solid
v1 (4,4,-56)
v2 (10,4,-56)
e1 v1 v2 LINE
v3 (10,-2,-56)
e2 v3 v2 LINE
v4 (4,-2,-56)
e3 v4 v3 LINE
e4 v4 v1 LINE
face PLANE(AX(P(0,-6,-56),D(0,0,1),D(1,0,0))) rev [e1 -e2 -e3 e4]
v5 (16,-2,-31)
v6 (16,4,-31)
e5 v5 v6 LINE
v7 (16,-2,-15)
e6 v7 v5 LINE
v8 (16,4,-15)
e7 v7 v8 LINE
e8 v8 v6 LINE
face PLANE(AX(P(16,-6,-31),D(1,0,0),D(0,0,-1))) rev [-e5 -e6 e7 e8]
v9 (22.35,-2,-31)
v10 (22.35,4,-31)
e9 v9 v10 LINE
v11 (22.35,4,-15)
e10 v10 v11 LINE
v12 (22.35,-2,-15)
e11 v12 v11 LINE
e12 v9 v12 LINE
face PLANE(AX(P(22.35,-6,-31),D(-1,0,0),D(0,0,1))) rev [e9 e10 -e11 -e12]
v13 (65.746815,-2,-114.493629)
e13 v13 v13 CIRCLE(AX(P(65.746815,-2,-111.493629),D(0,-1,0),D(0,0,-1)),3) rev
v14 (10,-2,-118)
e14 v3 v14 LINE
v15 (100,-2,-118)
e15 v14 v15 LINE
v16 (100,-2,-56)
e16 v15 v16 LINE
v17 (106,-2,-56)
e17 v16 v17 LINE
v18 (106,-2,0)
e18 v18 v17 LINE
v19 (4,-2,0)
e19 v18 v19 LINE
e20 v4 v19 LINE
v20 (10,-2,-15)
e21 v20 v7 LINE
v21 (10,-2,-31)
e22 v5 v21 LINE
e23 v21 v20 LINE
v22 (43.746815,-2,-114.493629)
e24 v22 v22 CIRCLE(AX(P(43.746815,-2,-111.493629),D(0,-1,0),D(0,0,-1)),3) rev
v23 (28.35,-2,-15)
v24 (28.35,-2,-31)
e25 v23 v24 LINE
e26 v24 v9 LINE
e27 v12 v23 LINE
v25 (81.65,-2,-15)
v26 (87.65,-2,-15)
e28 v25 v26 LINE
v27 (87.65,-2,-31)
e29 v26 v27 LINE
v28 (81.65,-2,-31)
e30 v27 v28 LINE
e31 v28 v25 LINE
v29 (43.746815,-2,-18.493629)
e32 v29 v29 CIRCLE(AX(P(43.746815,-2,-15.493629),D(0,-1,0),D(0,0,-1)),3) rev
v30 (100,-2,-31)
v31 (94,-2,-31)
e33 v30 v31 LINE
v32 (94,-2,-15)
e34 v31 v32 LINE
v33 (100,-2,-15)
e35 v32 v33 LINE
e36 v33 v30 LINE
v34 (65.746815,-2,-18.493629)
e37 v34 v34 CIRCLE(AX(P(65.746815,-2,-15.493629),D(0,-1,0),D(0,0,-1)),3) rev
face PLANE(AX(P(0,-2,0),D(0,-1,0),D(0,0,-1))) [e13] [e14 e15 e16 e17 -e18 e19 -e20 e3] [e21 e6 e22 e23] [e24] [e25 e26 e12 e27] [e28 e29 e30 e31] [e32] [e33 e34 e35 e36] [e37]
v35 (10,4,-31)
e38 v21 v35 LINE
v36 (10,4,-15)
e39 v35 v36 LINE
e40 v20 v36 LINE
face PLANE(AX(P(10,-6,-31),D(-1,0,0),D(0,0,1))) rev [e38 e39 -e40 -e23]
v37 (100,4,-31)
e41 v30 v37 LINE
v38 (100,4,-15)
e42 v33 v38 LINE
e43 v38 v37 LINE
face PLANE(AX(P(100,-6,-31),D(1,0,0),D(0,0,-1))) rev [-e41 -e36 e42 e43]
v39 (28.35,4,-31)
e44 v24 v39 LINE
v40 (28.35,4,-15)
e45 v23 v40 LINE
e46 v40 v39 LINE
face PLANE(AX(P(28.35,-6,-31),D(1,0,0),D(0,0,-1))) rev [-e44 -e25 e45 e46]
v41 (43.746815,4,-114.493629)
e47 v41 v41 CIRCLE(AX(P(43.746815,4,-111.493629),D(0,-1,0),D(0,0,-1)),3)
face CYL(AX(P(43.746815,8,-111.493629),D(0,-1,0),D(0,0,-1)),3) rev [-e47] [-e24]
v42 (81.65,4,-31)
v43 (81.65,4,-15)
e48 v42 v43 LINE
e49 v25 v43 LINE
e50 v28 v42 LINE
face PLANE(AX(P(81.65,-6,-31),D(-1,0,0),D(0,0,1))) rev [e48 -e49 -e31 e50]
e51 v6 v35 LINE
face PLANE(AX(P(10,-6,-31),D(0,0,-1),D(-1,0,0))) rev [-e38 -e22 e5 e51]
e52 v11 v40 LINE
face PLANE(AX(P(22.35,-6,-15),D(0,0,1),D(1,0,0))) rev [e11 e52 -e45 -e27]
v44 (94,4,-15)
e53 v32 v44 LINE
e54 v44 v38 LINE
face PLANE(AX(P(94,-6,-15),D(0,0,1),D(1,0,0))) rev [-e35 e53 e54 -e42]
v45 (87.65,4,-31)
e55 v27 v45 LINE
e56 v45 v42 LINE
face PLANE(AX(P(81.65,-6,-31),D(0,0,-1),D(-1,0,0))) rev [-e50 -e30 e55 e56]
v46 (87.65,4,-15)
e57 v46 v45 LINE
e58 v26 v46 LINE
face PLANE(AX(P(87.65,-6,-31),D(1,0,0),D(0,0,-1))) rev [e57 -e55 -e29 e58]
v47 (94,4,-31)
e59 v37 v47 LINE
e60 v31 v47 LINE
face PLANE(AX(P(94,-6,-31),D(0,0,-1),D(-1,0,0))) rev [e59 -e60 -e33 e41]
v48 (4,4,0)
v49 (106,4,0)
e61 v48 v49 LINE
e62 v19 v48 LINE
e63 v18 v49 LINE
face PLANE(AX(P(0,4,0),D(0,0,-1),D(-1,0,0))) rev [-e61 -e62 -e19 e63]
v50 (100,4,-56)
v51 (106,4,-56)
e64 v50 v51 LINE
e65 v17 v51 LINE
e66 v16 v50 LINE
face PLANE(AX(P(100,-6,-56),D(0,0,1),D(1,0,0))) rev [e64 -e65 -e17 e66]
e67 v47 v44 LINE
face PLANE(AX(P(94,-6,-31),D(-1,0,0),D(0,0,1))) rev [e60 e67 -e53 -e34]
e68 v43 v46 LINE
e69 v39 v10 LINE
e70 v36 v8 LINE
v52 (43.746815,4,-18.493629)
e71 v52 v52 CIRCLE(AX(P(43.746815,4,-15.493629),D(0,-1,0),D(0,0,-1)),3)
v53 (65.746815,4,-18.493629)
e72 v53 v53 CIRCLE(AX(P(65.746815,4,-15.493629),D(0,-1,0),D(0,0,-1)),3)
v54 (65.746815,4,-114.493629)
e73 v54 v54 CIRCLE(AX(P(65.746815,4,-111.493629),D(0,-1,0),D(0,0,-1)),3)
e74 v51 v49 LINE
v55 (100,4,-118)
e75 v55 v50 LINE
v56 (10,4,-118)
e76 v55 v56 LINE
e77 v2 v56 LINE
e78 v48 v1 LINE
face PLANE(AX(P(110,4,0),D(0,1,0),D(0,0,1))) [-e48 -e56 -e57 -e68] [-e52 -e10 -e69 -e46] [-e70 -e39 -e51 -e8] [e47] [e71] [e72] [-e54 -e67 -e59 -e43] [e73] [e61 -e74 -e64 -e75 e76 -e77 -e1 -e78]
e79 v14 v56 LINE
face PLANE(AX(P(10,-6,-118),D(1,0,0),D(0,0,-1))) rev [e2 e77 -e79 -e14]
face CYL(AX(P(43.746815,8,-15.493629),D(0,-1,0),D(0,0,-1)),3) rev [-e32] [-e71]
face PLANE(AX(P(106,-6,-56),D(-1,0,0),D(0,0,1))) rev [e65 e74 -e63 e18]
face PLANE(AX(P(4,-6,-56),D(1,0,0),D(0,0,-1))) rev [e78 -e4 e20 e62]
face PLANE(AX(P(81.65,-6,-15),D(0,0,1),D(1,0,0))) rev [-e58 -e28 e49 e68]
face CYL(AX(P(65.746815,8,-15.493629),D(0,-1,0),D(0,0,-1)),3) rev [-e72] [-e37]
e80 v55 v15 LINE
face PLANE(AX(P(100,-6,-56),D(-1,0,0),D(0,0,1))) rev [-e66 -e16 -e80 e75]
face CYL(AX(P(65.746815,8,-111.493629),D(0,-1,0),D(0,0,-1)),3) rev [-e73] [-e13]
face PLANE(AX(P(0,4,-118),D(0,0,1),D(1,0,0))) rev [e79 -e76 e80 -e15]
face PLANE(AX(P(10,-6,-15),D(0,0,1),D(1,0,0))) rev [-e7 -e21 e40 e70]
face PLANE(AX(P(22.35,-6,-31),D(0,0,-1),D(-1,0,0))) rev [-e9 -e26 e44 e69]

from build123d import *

# Parameters (mm, degrees)
SKETCH2_W           = 110
SKETCH2_H           = 118
BOSS_EXTRUDE1_DEPTH = 4
SKETCH3_W           = 10
SKETCH3_H           = 62
BOSS_EXTRUDE2_DEPTH = 16
CUT_EXTRUDE8_DEPTH  = 163.55460621
SKETCH12_W          = 6
SKETCH12_H          = 16
BOSS_EXTRUDE3_DEPTH = 16
SKETCH14_R          = 4
CUT_EXTRUDE9_DEPTH  = 156.961533719
CUT_EXTRUDE10_DEPTH = 3.5
SKETCH24_R          = 3
CUT_EXTRUDE15_DEPTH = 8
SPLIT2_OUTLINE_W    = 16
SPLIT2_OUTLINE_H    = 62
SPLIT2_DEPTH        = 110
SPLIT3_START        = 10
SPLIT3_OUTLINE_W    = 16
SPLIT3_OUTLINE_H    = 16
SPLIT3_OUTLINE_R    = 4
SPLIT3_DEPTH        = 90
SKETCH25_W          = 10
SKETCH25_H          = 62
SKETCH25_W_2        = 6
SKETCH25_H_2        = 16
CUT_EXTRUDE16_DEPTH = 10
SKETCH27_R          = 3.395097118
SKETCH27_R_2        = 3.39905673
BOSS_EXTRUDE4_DEPTH = 4
BOSS_EXTRUDE5_DEPTH = 2
CUT_EXTRUDE18_START = -6
SKETCH29_R          = 3
SKETCH29_W          = 6
SKETCH29_H          = 16
CUT_EXTRUDE18_DEPTH = 6
SKETCH30_W          = 4
SKETCH30_H          = 56
CUT_EXTRUDE19_DEPTH = 10


# Read off the part's stored shape, not the designer's step: Split2, Split3
with BuildPart() as part:
    # Sketch2 → Boss-Extrude1 (new body)
    with BuildSketch(Plane(origin=(0, 0, 0), x_dir=(1, 0, 0), z_dir=(0, 1, 0))):
        with Locations((55, 59)):
            Rectangle(SKETCH2_W, SKETCH2_H)
    extrude(amount=BOSS_EXTRUDE1_DEPTH)

    # Sketch3 → Boss-Extrude2 (add)
    with BuildSketch(Plane(origin=(0, 4, 0), x_dir=(1, 0, 0), z_dir=(0, 1, 0))):
        with Locations((5, 87)):
            Rectangle(SKETCH3_W, SKETCH3_H)
        with Locations((105, 87)):
            Rectangle(SKETCH3_W, SKETCH3_H)
    extrude(amount=BOSS_EXTRUDE2_DEPTH)

    # Sketch11 → Cut-Extrude8 (cut, through all)
    with BuildSketch(Plane.ZY):
        with BuildLine():
            Line((-111, 17.105440781), (-63, 17.105440781))
            ThreePointArc((-63, 17.105440781), (-59, 13.105440781), (-63, 9.105440781))
            Line((-63, 9.105440781), (-111, 9.105440781))
            ThreePointArc((-111, 9.105440781), (-115, 13.105440781), (-111, 17.105440781))
        make_face()
    extrude(amount=-CUT_EXTRUDE8_DEPTH, mode=Mode.SUBTRACT)

    # Sketch12 → Boss-Extrude3 (add)
    with BuildSketch(Plane(origin=(0, 4, 0), x_dir=(1, 0, 0), z_dir=(0, 1, 0))):
        with Locations((13, 23)):
            Rectangle(SKETCH12_W, SKETCH12_H)
        with Locations((97, 23)):
            Rectangle(SKETCH12_W, SKETCH12_H)
        with Locations((84.65, 23)):
            Rectangle(SKETCH12_W, SKETCH12_H)
        with Locations((25.35, 23)):
            Rectangle(SKETCH12_W, SKETCH12_H)
    extrude(amount=BOSS_EXTRUDE3_DEPTH)

    # Sketch14 → Cut-Extrude9 (cut, through all)
    with BuildSketch(Plane.ZY.offset(-10)):
        with Locations((-23, 14)):
            Circle(SKETCH14_R)
    extrude(amount=-CUT_EXTRUDE9_DEPTH, mode=Mode.SUBTRACT)

    # Sketch16 → Cut-Extrude10 (cut)
    with BuildSketch(Plane(origin=(10, 0, 0), x_dir=(0, 0, -1), z_dir=(1, 0, 0))):
        Polygon((74.219115806, 19.439463765), (74.219115806, 18.227285811), (62.862799814, 18.227285811), (62.862799814, 19.672541564), (62.862799814, 20.227285811), (74.219115806, 20.227285811), align=None)
    cut_extrude10 = extrude(amount=-CUT_EXTRUDE10_DEPTH, mode=Mode.SUBTRACT)

    # Mirror1: Cut-Extrude10 across plane
    add(cut_extrude10.mirror(Plane(origin=(55, 0, 0), x_dir=(0, 0, 1), z_dir=(1, 0, 0))), mode=Mode.SUBTRACT)

    # Sketch24 → Cut-Extrude15 (cut)
    with BuildSketch(Plane.XZ):
        with Locations(Location((65.746814509, -111.493629018, 0), (0, 0, 270))):
            Circle(SKETCH24_R)
        with Locations(Location((43.746814509, -111.493629018, 0), (0, 0, 270))):
            Circle(SKETCH24_R)
        with Locations(Location((65.746814509, -15.493629018, 0), (0, 0, 270))):
            Circle(SKETCH24_R)
        with Locations(Location((43.746814509, -15.493629018, 0), (0, 0, 270))):
            Circle(SKETCH24_R)
        with Locations(Location((102.746814509, -52.493629018, 0), (0, 0, 270))):
            Circle(SKETCH24_R)
        with Locations(Location((6.746814509, -52.493629018, 0), (0, 0, 270))):
            Circle(SKETCH24_R)
    extrude(amount=-CUT_EXTRUDE15_DEPTH, mode=Mode.SUBTRACT)

    # Split2 outline → Split2 (cut)
    with BuildSketch(Plane.YZ):
        with Locations((12, -87)):
            Rectangle(SPLIT2_OUTLINE_W, SPLIT2_OUTLINE_H)
        with BuildLine():
            Line((9.105440781, -111), (9.105440781, -63))
            ThreePointArc((9.105440781, -63), (13.105440781, -59), (17.105440781, -63))
            Line((17.105440781, -63), (17.105440781, -111))
            ThreePointArc((17.105440781, -111), (13.105440781, -115), (9.105440781, -111))
        make_face(mode=Mode.SUBTRACT)
    extrude(amount=SPLIT2_DEPTH, mode=Mode.SUBTRACT)

    # Split3 outline → Split3 (cut)
    with BuildSketch(Plane.YZ.offset(SPLIT3_START)):
        with Locations((12, -23)):
            Rectangle(SPLIT3_OUTLINE_W, SPLIT3_OUTLINE_H)
        with Locations((14, -23)):
            Circle(SPLIT3_OUTLINE_R, mode=Mode.SUBTRACT)
    extrude(amount=SPLIT3_DEPTH, mode=Mode.SUBTRACT)

    # Sketch25 → Cut-Extrude16 (cut)
    with BuildSketch(Plane(origin=(0, 4, 0), x_dir=(1, 0, 0), z_dir=(0, 1, 0))):
        with Locations((5, 87)):
            Rectangle(SKETCH25_W, SKETCH25_H)
        with Locations((13, 23)):
            Rectangle(SKETCH25_W_2, SKETCH25_H_2)
        with Locations((25.35, 23)):
            Rectangle(SKETCH25_W_2, SKETCH25_H_2)
        with Locations((84.65, 23)):
            Rectangle(SKETCH25_W_2, SKETCH25_H_2)
        with Locations((97, 23)):
            Rectangle(SKETCH25_W_2, SKETCH25_H_2)
        with Locations((105, 87)):
            Rectangle(SKETCH25_W, SKETCH25_H)
    extrude(amount=-CUT_EXTRUDE16_DEPTH, mode=Mode.SUBTRACT)

    # Sketch27 → Boss-Extrude4 (add)
    with BuildSketch(Plane(origin=(0, 4, 0), x_dir=(1, 0, 0), z_dir=(0, 1, 0))):
        with Locations((6.746814509, 52.493629018)):
            Circle(SKETCH27_R)
        with Locations((102.746814509, 52.493629018)):
            Circle(SKETCH27_R_2)
    extrude(amount=-BOSS_EXTRUDE4_DEPTH)

    # Sketch28 → Boss-Extrude5 (add)
    with BuildSketch(Plane.XZ):
        Polygon((100, -56), (110, -56), (110, 0), (0, 0), (0, -56), (10, -56), (10, -118), (100, -118), align=None)
    extrude(amount=BOSS_EXTRUDE5_DEPTH)

    # Sketch29 → Cut-Extrude18 (cut)
    with BuildSketch(Plane(origin=(0, 4, 0), x_dir=(1, 0, 0), z_dir=(0, 1, 0)).offset(CUT_EXTRUDE18_START)):
        with Locations(Location((43.746814509, 111.493629018, 0), (0, 0, 90))):
            Circle(SKETCH29_R)
        with Locations(Location((65.746814509, 111.493629018, 0), (0, 0, 90))):
            Circle(SKETCH29_R)
        with Locations(Location((43.746814509, 15.493629018, 0), (0, 0, 90))):
            Circle(SKETCH29_R)
        with Locations(Location((65.746814509, 15.493629018, 0), (0, 0, 90))):
            Circle(SKETCH29_R)
        with Locations((25.35, 23)):
            Rectangle(SKETCH29_W, SKETCH29_H)
        with Locations((13, 23)):
            Rectangle(SKETCH29_W, SKETCH29_H)
        with Locations((84.65, 23)):
            Rectangle(SKETCH29_W, SKETCH29_H)
        with Locations((97, 23)):
            Rectangle(SKETCH29_W, SKETCH29_H)
    extrude(amount=CUT_EXTRUDE18_DEPTH, mode=Mode.SUBTRACT)

    # Sketch30 → Cut-Extrude19 (cut)
    with BuildSketch(Plane(origin=(0, 4, 0), x_dir=(1, 0, 0), z_dir=(0, 1, 0))):
        with Locations((2, 28)):
            Rectangle(SKETCH30_W, SKETCH30_H)
        with Locations((108, 28)):
            Rectangle(SKETCH30_W, SKETCH30_H)
    extrude(amount=-CUT_EXTRUDE19_DEPTH, mode=Mode.SUBTRACT)


solid = part.part
